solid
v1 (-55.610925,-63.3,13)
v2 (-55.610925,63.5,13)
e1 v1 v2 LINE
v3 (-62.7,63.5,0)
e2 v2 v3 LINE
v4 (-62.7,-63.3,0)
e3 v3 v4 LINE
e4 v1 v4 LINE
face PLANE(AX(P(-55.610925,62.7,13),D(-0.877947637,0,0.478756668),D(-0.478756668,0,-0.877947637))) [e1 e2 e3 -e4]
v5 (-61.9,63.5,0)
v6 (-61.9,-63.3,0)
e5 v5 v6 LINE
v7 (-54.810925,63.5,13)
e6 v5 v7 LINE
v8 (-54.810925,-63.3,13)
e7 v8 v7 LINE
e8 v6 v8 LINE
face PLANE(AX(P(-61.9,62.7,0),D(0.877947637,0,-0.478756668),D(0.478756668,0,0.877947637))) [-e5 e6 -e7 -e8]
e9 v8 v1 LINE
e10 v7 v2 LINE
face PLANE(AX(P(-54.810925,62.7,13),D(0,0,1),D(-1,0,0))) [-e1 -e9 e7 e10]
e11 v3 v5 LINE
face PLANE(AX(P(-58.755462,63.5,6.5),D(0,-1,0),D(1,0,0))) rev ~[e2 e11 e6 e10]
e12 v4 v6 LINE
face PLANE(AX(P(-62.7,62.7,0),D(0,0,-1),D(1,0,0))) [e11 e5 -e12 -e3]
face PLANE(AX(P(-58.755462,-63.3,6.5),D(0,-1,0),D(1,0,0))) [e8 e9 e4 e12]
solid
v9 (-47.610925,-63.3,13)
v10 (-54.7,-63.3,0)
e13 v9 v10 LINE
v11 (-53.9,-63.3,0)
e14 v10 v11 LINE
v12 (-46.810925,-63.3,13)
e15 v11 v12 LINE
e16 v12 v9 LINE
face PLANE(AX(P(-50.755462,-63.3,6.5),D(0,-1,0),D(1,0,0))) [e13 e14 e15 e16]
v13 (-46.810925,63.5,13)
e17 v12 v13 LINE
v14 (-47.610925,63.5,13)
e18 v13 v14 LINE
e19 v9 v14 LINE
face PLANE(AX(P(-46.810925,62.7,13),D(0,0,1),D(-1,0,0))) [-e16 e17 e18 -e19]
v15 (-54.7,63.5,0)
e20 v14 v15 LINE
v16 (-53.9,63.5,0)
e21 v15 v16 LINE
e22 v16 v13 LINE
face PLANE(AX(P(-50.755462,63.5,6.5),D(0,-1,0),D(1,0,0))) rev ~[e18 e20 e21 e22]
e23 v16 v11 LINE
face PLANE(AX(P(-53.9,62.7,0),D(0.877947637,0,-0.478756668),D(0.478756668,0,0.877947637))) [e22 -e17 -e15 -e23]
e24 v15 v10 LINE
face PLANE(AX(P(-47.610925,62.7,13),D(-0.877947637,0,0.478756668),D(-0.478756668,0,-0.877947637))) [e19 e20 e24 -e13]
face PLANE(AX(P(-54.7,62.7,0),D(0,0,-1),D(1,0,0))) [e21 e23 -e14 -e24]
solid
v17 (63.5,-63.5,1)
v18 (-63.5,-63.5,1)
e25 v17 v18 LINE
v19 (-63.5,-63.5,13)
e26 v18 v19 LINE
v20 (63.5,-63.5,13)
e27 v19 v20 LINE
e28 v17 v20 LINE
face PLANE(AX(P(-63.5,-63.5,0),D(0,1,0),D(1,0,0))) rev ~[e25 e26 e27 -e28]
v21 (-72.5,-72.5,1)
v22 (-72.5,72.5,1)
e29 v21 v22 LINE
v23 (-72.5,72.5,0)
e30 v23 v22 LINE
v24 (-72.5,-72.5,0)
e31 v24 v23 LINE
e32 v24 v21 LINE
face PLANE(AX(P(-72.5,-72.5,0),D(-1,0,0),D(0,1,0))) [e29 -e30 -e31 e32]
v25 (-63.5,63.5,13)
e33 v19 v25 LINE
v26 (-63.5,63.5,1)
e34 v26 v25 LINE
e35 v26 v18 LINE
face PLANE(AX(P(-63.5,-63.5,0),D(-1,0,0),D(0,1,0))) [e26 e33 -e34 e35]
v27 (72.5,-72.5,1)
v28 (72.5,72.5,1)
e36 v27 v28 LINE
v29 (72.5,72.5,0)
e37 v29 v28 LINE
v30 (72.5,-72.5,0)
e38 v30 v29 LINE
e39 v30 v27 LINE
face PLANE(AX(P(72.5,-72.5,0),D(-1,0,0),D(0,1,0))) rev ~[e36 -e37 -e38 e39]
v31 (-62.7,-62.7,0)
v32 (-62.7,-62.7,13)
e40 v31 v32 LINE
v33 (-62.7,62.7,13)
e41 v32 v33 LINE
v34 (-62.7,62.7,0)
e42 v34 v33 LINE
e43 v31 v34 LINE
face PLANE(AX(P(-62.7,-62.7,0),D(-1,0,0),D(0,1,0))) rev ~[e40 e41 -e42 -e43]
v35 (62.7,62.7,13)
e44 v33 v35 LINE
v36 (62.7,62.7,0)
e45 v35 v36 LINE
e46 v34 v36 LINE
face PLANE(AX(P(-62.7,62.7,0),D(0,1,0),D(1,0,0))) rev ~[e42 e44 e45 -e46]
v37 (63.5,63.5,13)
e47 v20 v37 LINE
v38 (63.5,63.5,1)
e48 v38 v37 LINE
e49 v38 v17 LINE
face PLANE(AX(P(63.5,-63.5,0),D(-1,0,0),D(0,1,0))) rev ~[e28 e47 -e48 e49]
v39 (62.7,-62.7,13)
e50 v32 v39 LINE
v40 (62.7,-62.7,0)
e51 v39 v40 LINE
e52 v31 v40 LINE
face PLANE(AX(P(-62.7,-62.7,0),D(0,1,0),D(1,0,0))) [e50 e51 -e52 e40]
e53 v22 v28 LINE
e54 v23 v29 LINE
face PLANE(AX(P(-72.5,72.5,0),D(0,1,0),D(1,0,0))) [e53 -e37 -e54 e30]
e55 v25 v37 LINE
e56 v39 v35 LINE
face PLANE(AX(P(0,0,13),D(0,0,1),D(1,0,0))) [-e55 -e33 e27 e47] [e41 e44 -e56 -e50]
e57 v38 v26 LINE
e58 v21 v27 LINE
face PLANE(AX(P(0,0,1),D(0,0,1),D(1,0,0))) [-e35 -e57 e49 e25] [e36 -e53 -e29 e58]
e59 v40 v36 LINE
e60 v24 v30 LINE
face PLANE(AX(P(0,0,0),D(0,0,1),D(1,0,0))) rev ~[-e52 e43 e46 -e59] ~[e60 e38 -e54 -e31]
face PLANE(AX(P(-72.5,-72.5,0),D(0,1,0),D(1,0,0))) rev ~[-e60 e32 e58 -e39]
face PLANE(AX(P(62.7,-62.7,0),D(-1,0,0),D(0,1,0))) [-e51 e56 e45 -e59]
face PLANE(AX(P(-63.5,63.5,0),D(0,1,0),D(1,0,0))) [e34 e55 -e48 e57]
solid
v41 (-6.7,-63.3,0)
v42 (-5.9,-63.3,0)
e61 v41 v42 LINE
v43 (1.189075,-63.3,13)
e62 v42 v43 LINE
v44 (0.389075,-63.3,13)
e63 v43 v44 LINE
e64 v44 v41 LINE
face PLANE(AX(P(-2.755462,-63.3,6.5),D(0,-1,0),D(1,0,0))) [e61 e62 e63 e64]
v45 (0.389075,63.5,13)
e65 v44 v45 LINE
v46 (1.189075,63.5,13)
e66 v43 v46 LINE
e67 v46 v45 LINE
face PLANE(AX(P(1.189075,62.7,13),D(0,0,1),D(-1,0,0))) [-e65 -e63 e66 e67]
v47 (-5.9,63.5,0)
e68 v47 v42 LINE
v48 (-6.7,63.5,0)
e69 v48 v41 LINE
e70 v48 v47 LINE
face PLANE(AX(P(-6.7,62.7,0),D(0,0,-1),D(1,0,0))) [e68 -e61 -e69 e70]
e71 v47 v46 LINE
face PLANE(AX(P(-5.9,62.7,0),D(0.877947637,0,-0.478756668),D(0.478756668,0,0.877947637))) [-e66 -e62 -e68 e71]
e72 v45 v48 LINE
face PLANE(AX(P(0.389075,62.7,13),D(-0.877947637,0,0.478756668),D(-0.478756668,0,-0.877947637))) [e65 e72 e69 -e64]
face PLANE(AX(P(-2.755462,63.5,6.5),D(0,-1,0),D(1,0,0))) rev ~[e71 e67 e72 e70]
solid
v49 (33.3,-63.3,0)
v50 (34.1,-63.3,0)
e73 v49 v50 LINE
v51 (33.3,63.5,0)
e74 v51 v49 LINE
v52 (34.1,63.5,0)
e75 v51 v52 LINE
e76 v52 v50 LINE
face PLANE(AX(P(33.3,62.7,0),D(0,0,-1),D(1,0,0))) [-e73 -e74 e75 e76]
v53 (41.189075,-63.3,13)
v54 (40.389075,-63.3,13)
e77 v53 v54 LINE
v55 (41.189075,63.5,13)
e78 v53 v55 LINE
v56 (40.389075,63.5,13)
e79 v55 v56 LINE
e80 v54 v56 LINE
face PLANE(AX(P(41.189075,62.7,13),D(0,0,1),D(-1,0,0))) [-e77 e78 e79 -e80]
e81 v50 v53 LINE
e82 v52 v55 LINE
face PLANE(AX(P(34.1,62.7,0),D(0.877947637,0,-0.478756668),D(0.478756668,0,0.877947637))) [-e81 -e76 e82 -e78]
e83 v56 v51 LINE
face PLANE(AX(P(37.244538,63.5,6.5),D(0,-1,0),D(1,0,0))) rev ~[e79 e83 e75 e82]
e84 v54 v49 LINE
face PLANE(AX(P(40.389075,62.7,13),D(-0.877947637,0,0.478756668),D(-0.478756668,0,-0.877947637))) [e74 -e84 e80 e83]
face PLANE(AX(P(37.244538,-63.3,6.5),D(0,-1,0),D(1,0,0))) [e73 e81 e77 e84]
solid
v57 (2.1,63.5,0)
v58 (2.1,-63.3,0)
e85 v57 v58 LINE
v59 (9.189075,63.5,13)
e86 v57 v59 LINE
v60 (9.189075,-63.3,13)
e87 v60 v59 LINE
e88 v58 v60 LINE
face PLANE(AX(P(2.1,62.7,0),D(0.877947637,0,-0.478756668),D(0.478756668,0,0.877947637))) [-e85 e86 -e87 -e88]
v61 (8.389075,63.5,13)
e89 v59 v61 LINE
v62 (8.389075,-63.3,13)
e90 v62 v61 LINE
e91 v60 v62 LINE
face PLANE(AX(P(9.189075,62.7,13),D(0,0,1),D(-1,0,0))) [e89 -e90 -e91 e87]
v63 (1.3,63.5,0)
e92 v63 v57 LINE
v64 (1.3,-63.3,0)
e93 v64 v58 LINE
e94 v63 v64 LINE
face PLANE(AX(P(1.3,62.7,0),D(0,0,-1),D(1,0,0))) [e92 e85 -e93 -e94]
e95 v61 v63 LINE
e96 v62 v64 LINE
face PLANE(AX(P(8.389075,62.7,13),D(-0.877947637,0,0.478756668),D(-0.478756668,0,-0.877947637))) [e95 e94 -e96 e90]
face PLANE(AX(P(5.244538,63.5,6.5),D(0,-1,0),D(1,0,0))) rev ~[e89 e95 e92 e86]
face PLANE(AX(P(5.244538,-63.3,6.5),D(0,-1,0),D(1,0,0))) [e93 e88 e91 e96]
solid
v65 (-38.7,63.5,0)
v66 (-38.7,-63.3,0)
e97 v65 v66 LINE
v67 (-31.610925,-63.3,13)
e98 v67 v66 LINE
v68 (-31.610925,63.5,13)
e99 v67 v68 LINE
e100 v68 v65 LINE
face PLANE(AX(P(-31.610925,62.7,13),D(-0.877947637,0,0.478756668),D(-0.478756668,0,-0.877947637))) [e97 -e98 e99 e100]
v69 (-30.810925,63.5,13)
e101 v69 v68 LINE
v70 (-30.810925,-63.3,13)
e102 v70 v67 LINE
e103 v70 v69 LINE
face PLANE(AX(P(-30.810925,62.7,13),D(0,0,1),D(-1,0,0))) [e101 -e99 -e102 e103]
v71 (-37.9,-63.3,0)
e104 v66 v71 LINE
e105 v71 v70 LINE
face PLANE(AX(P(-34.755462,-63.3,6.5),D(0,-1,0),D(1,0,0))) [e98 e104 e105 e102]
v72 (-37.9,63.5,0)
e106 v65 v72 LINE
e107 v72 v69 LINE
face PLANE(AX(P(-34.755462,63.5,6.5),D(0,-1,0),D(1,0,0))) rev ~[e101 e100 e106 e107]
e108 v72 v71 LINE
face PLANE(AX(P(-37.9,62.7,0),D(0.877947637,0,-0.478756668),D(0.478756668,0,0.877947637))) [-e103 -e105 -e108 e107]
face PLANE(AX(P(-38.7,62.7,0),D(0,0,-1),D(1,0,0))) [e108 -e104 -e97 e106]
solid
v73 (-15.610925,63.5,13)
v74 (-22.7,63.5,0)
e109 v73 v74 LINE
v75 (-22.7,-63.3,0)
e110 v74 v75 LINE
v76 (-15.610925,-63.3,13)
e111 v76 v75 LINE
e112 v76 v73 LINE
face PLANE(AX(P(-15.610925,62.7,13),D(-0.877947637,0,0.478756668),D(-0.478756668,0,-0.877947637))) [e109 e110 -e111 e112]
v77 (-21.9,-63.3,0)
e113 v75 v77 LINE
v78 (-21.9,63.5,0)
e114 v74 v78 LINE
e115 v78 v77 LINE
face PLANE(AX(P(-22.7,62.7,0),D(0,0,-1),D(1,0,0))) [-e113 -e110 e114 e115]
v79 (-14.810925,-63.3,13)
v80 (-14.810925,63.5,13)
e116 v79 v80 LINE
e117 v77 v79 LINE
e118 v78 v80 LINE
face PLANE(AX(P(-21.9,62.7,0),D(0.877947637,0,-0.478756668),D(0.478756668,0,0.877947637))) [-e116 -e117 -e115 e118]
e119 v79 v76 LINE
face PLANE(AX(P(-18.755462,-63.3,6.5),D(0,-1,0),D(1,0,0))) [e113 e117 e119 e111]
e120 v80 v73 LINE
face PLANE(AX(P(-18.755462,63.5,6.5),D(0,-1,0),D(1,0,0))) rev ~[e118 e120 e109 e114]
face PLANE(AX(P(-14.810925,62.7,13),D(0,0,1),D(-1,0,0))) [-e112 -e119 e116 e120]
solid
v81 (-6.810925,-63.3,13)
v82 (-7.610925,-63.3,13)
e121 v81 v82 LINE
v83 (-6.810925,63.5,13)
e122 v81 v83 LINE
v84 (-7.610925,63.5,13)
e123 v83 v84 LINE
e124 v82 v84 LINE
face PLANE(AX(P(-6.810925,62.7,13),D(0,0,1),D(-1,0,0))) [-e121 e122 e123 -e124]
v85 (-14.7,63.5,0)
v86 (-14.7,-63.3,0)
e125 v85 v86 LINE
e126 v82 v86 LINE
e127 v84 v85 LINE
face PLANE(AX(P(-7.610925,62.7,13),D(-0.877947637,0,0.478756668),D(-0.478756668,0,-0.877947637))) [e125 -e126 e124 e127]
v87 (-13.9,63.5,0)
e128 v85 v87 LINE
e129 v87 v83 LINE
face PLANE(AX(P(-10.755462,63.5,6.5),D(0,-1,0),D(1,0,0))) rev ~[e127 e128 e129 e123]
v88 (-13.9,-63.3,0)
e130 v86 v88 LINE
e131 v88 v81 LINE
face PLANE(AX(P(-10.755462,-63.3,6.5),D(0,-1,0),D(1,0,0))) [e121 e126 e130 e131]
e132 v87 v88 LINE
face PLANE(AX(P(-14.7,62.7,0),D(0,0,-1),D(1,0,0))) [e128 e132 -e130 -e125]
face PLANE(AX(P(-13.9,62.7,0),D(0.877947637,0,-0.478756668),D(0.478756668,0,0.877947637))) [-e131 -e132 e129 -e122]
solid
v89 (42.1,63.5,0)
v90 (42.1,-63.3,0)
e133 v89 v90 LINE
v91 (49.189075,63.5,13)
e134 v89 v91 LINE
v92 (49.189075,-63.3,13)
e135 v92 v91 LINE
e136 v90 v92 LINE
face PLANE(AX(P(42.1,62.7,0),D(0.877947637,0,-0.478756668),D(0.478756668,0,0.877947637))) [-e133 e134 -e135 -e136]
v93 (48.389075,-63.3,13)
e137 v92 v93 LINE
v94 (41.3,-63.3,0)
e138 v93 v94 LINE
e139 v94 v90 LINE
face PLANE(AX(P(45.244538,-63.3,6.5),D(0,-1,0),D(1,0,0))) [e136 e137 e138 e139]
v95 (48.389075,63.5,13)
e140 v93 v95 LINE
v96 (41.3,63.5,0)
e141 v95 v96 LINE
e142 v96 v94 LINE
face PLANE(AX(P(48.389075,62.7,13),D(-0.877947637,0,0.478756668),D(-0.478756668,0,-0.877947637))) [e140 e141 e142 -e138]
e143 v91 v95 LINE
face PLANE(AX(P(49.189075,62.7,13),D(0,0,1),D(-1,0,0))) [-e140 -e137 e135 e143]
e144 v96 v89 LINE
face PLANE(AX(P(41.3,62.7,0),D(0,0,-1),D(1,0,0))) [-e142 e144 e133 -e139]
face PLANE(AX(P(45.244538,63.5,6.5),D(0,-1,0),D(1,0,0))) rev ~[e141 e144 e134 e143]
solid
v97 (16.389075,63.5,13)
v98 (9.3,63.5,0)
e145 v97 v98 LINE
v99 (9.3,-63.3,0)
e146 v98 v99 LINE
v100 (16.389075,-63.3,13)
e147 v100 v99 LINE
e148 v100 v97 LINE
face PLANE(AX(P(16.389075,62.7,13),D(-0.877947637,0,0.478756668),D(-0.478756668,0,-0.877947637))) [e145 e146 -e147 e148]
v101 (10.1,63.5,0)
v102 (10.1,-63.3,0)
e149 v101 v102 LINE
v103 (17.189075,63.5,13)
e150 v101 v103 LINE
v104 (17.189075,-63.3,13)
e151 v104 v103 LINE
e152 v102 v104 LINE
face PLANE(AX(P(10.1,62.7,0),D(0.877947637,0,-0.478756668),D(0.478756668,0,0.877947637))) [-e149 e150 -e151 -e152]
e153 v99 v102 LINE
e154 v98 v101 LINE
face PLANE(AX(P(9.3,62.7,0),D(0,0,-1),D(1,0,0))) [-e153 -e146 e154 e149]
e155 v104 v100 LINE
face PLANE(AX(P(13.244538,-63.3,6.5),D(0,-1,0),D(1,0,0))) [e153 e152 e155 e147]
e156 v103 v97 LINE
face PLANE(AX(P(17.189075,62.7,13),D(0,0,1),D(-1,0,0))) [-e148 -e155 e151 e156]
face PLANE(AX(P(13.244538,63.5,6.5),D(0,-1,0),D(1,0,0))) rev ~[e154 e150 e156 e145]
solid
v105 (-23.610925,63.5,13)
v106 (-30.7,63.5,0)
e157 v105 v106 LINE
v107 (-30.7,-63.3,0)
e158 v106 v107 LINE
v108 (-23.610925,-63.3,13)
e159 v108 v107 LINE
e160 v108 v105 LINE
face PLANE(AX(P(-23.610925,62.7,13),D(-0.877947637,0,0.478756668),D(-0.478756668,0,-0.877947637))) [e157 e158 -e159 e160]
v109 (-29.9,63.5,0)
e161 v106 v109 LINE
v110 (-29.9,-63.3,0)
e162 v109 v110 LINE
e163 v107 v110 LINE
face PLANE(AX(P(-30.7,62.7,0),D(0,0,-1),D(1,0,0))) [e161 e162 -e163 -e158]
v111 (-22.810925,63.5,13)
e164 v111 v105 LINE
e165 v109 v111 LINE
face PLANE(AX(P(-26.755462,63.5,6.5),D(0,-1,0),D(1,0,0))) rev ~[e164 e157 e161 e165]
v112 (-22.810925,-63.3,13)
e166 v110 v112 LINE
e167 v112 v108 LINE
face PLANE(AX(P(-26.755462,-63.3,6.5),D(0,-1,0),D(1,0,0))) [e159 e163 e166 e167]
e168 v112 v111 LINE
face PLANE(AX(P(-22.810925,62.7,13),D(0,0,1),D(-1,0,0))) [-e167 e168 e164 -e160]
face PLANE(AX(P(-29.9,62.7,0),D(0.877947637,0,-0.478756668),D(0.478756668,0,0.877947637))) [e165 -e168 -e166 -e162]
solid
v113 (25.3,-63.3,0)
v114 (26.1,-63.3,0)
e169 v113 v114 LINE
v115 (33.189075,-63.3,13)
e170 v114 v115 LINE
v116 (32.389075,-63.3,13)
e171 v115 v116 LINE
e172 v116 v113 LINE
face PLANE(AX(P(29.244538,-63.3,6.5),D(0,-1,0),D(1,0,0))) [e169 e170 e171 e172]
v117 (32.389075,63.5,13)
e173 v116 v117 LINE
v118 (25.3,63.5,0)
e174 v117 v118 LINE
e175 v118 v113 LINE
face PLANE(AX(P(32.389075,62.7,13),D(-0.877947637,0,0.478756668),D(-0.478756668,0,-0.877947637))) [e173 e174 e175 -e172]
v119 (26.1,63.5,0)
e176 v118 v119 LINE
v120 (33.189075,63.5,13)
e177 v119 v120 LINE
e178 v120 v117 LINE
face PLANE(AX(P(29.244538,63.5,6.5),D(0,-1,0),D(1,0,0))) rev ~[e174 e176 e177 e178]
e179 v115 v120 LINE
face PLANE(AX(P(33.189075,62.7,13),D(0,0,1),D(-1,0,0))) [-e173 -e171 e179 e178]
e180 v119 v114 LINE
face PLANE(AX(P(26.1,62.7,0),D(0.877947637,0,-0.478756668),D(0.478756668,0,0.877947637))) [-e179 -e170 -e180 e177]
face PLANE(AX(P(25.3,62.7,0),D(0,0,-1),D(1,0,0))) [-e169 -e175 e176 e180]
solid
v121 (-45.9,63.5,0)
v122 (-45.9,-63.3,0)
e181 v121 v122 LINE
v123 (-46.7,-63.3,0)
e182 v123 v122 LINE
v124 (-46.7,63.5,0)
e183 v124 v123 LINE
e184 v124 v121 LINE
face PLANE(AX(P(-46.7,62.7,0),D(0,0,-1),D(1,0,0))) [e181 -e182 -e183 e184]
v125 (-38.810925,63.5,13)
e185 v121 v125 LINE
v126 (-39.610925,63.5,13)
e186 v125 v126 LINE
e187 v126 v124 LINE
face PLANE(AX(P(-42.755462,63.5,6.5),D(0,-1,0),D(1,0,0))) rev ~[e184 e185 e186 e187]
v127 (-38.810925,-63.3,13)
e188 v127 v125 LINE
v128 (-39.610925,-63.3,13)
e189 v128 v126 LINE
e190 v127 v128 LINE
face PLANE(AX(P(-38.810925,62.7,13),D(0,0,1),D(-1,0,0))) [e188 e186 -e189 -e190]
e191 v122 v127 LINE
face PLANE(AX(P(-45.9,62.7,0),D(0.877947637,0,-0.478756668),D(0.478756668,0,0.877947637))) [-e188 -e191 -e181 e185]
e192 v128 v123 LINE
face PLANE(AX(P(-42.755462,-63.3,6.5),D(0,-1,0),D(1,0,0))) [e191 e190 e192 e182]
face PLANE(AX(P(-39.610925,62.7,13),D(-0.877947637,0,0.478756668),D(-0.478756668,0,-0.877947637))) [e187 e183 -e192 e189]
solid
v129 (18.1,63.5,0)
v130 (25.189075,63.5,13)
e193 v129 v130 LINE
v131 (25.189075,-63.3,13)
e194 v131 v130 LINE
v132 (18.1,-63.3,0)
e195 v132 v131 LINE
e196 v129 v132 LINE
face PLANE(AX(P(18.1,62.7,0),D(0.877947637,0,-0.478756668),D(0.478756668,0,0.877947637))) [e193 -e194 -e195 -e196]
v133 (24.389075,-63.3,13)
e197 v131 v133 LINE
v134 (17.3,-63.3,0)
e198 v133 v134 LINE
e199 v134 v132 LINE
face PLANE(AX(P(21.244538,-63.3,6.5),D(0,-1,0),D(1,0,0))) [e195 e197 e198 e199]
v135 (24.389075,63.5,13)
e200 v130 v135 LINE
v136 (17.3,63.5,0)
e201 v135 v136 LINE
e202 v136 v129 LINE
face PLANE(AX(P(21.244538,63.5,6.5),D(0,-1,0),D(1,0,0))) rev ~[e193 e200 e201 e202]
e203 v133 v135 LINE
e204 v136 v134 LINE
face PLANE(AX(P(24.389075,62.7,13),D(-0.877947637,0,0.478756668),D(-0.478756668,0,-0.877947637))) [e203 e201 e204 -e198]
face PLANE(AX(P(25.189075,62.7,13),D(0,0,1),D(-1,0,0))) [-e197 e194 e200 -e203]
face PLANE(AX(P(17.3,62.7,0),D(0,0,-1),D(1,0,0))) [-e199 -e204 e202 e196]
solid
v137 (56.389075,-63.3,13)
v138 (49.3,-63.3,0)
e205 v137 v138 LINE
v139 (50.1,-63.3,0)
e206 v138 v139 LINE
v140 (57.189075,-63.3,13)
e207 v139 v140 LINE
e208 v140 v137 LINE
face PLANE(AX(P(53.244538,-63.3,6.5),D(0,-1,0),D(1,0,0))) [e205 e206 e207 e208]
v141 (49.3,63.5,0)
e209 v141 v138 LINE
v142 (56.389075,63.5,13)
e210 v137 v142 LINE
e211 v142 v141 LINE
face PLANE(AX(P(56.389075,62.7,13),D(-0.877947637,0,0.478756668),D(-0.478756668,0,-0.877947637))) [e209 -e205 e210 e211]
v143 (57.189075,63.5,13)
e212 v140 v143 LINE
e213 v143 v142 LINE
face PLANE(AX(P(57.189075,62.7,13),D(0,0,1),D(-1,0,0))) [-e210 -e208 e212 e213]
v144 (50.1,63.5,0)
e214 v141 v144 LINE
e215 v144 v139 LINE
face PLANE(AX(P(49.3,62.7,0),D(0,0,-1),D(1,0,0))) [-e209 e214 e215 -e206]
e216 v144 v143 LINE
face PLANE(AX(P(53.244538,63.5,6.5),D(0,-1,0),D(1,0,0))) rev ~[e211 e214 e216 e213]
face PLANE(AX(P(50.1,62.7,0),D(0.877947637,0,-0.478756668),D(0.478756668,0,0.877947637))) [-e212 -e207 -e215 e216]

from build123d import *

# Parameters (mm, degrees)
F0_W          = 145
F0_H          = 145
F0_W_2        = 127
F0_H_2        = 127
F0_W_3        = 125.4
F0_H_3        = 125.4
F1_DEPTH      = 1
F2_DEPTH      = 13
F4_DEPTH      = 126
F4_DEPTH_BACK = 0.8


# Not quite as in the source:
# - a feature names something its author has since deleted; it is built from what else it names


with BuildPart() as f1:
    # F0 (on Top) → F1 (new body)
    with BuildSketch(Plane.XY):
        Rectangle(F0_W, F0_H)
        Rectangle(F0_W_2, F0_H_2, mode=Mode.SUBTRACT)
        Rectangle(F0_W_2, F0_H_2)
        Rectangle(F0_W_3, F0_H_3, mode=Mode.SUBTRACT)
    extrude(amount=F1_DEPTH)

    # F0 (on Top) → F2 (join)
    with BuildSketch(Plane.XY):
        Rectangle(F0_W_2, F0_H_2)
        Rectangle(F0_W_3, F0_H_3, mode=Mode.SUBTRACT)
    extrude(amount=F2_DEPTH)


with BuildPart() as f4:
    # F3 (on face) → F4 (new body, two sides)
    with BuildSketch(Plane.XZ.offset(-62.7)) as f4_sk:
        Polygon((-55.6109249592, 13), (-62.7, 0), (-61.9, 0), (-54.8109249592, 13), align=None)
    extrude(amount=F4_DEPTH)
    extrude(f4_sk.sketch, amount=-F4_DEPTH_BACK)


with BuildPart() as f4b:
    # F3 (on face) → F4, piece 2 (new body, two sides)
    with BuildSketch(Plane.XZ.offset(-62.7)) as f4_2_sk:
        Polygon((-47.6109249592, 13), (-54.7, 0), (-53.9, 0), (-46.8109249592, 13), align=None)
    extrude(amount=F4_DEPTH)
    extrude(f4_2_sk.sketch, amount=-F4_DEPTH_BACK)


with BuildPart() as f4c:
    # F3 (on face) → F4, piece 3 (new body, two sides)
    with BuildSketch(Plane.XZ.offset(-62.7)) as f4_3_sk:
        Polygon((-39.6109249592, 13), (-46.7, 0), (-45.9, 0), (-38.8109249592, 13), align=None)
    extrude(amount=F4_DEPTH)
    extrude(f4_3_sk.sketch, amount=-F4_DEPTH_BACK)


with BuildPart() as f4d:
    # F3 (on face) → F4, piece 4 (new body, two sides)
    with BuildSketch(Plane.XZ.offset(-62.7)) as f4_4_sk:
        Polygon((-31.6109249592, 13), (-38.7, 0), (-37.9, 0), (-30.8109249592, 13), align=None)
    extrude(amount=F4_DEPTH)
    extrude(f4_4_sk.sketch, amount=-F4_DEPTH_BACK)


with BuildPart() as f4e:
    # F3 (on face) → F4, piece 5 (new body, two sides)
    with BuildSketch(Plane.XZ.offset(-62.7)) as f4_5_sk:
        Polygon((-23.6109249592, 13), (-30.7, 0), (-29.9, 0), (-22.8109249592, 13), align=None)
    extrude(amount=F4_DEPTH)
    extrude(f4_5_sk.sketch, amount=-F4_DEPTH_BACK)


with BuildPart() as f4f:
    # F3 (on face) → F4, piece 6 (new body, two sides)
    with BuildSketch(Plane.XZ.offset(-62.7)) as f4_6_sk:
        Polygon((-15.6109249592, 13), (-22.7, 0), (-21.9, 0), (-14.8109249592, 13), align=None)
    extrude(amount=F4_DEPTH)
    extrude(f4_6_sk.sketch, amount=-F4_DEPTH_BACK)


with BuildPart() as f4g:
    # F3 (on face) → F4, piece 7 (new body, two sides)
    with BuildSketch(Plane.XZ.offset(-62.7)) as f4_7_sk:
        Polygon((-7.6109249592, 13), (-14.7, 0), (-13.9, 0), (-6.8109249592, 13), align=None)
    extrude(amount=F4_DEPTH)
    extrude(f4_7_sk.sketch, amount=-F4_DEPTH_BACK)


with BuildPart() as f4h:
    # F3 (on face) → F4, piece 8 (new body, two sides)
    with BuildSketch(Plane.XZ.offset(-62.7)) as f4_8_sk:
        Polygon((0.3890750408, 13), (-6.7, 0), (-5.9, 0), (1.1890750408, 13), align=None)
    extrude(amount=F4_DEPTH)
    extrude(f4_8_sk.sketch, amount=-F4_DEPTH_BACK)


with BuildPart() as f4i:
    # F3 (on face) → F4, piece 9 (new body, two sides)
    with BuildSketch(Plane.XZ.offset(-62.7)) as f4_9_sk:
        Polygon((8.3890750408, 13), (1.3, 0), (2.1, 0), (9.1890750408, 13), align=None)
    extrude(amount=F4_DEPTH)
    extrude(f4_9_sk.sketch, amount=-F4_DEPTH_BACK)


with BuildPart() as f4j:
    # F3 (on face) → F4, piece 10 (new body, two sides)
    with BuildSketch(Plane.XZ.offset(-62.7)) as f4_10_sk:
        Polygon((16.3890750408, 13), (9.3, 0), (10.1, 0), (17.1890750408, 13), align=None)
    extrude(amount=F4_DEPTH)
    extrude(f4_10_sk.sketch, amount=-F4_DEPTH_BACK)


with BuildPart() as f4k:
    # F3 (on face) → F4, piece 11 (new body, two sides)
    with BuildSketch(Plane.XZ.offset(-62.7)) as f4_11_sk:
        Polygon((24.3890750408, 13), (17.3, 0), (18.1, 0), (25.1890750408, 13), align=None)
    extrude(amount=F4_DEPTH)
    extrude(f4_11_sk.sketch, amount=-F4_DEPTH_BACK)


with BuildPart() as f4l:
    # F3 (on face) → F4, piece 12 (new body, two sides)
    with BuildSketch(Plane.XZ.offset(-62.7)) as f4_12_sk:
        Polygon((32.3890750408, 13), (25.3, 0), (26.1, 0), (33.1890750408, 13), align=None)
    extrude(amount=F4_DEPTH)
    extrude(f4_12_sk.sketch, amount=-F4_DEPTH_BACK)


with BuildPart() as f4m:
    # F3 (on face) → F4, piece 13 (new body, two sides)
    with BuildSketch(Plane.XZ.offset(-62.7)) as f4_13_sk:
        Polygon((40.3890750408, 13), (33.3, 0), (34.1, 0), (41.1890750408, 13), align=None)
    extrude(amount=F4_DEPTH)
    extrude(f4_13_sk.sketch, amount=-F4_DEPTH_BACK)


with BuildPart() as f4n:
    # F3 (on face) → F4, piece 14 (new body, two sides)
    with BuildSketch(Plane.XZ.offset(-62.7)) as f4_14_sk:
        Polygon((48.3890750408, 13), (41.3, 0), (42.1, 0), (49.1890750408, 13), align=None)
    extrude(amount=F4_DEPTH)
    extrude(f4_14_sk.sketch, amount=-F4_DEPTH_BACK)


with BuildPart() as f4o:
    # F3 (on face) → F4, piece 15 (new body, two sides)
    with BuildSketch(Plane.XZ.offset(-62.7)) as f4_15_sk:
        Polygon((56.3890750408, 13), (49.3, 0), (50.1, 0), (57.1890750408, 13), align=None)
    extrude(amount=F4_DEPTH)
    extrude(f4_15_sk.sketch, amount=-F4_DEPTH_BACK)


solid = Compound([f1.part, f4.part, f4b.part, f4c.part, f4d.part, f4e.part, f4f.part, f4g.part, f4h.part, f4i.part, f4j.part, f4k.part, f4l.part, f4m.part, f4n.part, f4o.part])
